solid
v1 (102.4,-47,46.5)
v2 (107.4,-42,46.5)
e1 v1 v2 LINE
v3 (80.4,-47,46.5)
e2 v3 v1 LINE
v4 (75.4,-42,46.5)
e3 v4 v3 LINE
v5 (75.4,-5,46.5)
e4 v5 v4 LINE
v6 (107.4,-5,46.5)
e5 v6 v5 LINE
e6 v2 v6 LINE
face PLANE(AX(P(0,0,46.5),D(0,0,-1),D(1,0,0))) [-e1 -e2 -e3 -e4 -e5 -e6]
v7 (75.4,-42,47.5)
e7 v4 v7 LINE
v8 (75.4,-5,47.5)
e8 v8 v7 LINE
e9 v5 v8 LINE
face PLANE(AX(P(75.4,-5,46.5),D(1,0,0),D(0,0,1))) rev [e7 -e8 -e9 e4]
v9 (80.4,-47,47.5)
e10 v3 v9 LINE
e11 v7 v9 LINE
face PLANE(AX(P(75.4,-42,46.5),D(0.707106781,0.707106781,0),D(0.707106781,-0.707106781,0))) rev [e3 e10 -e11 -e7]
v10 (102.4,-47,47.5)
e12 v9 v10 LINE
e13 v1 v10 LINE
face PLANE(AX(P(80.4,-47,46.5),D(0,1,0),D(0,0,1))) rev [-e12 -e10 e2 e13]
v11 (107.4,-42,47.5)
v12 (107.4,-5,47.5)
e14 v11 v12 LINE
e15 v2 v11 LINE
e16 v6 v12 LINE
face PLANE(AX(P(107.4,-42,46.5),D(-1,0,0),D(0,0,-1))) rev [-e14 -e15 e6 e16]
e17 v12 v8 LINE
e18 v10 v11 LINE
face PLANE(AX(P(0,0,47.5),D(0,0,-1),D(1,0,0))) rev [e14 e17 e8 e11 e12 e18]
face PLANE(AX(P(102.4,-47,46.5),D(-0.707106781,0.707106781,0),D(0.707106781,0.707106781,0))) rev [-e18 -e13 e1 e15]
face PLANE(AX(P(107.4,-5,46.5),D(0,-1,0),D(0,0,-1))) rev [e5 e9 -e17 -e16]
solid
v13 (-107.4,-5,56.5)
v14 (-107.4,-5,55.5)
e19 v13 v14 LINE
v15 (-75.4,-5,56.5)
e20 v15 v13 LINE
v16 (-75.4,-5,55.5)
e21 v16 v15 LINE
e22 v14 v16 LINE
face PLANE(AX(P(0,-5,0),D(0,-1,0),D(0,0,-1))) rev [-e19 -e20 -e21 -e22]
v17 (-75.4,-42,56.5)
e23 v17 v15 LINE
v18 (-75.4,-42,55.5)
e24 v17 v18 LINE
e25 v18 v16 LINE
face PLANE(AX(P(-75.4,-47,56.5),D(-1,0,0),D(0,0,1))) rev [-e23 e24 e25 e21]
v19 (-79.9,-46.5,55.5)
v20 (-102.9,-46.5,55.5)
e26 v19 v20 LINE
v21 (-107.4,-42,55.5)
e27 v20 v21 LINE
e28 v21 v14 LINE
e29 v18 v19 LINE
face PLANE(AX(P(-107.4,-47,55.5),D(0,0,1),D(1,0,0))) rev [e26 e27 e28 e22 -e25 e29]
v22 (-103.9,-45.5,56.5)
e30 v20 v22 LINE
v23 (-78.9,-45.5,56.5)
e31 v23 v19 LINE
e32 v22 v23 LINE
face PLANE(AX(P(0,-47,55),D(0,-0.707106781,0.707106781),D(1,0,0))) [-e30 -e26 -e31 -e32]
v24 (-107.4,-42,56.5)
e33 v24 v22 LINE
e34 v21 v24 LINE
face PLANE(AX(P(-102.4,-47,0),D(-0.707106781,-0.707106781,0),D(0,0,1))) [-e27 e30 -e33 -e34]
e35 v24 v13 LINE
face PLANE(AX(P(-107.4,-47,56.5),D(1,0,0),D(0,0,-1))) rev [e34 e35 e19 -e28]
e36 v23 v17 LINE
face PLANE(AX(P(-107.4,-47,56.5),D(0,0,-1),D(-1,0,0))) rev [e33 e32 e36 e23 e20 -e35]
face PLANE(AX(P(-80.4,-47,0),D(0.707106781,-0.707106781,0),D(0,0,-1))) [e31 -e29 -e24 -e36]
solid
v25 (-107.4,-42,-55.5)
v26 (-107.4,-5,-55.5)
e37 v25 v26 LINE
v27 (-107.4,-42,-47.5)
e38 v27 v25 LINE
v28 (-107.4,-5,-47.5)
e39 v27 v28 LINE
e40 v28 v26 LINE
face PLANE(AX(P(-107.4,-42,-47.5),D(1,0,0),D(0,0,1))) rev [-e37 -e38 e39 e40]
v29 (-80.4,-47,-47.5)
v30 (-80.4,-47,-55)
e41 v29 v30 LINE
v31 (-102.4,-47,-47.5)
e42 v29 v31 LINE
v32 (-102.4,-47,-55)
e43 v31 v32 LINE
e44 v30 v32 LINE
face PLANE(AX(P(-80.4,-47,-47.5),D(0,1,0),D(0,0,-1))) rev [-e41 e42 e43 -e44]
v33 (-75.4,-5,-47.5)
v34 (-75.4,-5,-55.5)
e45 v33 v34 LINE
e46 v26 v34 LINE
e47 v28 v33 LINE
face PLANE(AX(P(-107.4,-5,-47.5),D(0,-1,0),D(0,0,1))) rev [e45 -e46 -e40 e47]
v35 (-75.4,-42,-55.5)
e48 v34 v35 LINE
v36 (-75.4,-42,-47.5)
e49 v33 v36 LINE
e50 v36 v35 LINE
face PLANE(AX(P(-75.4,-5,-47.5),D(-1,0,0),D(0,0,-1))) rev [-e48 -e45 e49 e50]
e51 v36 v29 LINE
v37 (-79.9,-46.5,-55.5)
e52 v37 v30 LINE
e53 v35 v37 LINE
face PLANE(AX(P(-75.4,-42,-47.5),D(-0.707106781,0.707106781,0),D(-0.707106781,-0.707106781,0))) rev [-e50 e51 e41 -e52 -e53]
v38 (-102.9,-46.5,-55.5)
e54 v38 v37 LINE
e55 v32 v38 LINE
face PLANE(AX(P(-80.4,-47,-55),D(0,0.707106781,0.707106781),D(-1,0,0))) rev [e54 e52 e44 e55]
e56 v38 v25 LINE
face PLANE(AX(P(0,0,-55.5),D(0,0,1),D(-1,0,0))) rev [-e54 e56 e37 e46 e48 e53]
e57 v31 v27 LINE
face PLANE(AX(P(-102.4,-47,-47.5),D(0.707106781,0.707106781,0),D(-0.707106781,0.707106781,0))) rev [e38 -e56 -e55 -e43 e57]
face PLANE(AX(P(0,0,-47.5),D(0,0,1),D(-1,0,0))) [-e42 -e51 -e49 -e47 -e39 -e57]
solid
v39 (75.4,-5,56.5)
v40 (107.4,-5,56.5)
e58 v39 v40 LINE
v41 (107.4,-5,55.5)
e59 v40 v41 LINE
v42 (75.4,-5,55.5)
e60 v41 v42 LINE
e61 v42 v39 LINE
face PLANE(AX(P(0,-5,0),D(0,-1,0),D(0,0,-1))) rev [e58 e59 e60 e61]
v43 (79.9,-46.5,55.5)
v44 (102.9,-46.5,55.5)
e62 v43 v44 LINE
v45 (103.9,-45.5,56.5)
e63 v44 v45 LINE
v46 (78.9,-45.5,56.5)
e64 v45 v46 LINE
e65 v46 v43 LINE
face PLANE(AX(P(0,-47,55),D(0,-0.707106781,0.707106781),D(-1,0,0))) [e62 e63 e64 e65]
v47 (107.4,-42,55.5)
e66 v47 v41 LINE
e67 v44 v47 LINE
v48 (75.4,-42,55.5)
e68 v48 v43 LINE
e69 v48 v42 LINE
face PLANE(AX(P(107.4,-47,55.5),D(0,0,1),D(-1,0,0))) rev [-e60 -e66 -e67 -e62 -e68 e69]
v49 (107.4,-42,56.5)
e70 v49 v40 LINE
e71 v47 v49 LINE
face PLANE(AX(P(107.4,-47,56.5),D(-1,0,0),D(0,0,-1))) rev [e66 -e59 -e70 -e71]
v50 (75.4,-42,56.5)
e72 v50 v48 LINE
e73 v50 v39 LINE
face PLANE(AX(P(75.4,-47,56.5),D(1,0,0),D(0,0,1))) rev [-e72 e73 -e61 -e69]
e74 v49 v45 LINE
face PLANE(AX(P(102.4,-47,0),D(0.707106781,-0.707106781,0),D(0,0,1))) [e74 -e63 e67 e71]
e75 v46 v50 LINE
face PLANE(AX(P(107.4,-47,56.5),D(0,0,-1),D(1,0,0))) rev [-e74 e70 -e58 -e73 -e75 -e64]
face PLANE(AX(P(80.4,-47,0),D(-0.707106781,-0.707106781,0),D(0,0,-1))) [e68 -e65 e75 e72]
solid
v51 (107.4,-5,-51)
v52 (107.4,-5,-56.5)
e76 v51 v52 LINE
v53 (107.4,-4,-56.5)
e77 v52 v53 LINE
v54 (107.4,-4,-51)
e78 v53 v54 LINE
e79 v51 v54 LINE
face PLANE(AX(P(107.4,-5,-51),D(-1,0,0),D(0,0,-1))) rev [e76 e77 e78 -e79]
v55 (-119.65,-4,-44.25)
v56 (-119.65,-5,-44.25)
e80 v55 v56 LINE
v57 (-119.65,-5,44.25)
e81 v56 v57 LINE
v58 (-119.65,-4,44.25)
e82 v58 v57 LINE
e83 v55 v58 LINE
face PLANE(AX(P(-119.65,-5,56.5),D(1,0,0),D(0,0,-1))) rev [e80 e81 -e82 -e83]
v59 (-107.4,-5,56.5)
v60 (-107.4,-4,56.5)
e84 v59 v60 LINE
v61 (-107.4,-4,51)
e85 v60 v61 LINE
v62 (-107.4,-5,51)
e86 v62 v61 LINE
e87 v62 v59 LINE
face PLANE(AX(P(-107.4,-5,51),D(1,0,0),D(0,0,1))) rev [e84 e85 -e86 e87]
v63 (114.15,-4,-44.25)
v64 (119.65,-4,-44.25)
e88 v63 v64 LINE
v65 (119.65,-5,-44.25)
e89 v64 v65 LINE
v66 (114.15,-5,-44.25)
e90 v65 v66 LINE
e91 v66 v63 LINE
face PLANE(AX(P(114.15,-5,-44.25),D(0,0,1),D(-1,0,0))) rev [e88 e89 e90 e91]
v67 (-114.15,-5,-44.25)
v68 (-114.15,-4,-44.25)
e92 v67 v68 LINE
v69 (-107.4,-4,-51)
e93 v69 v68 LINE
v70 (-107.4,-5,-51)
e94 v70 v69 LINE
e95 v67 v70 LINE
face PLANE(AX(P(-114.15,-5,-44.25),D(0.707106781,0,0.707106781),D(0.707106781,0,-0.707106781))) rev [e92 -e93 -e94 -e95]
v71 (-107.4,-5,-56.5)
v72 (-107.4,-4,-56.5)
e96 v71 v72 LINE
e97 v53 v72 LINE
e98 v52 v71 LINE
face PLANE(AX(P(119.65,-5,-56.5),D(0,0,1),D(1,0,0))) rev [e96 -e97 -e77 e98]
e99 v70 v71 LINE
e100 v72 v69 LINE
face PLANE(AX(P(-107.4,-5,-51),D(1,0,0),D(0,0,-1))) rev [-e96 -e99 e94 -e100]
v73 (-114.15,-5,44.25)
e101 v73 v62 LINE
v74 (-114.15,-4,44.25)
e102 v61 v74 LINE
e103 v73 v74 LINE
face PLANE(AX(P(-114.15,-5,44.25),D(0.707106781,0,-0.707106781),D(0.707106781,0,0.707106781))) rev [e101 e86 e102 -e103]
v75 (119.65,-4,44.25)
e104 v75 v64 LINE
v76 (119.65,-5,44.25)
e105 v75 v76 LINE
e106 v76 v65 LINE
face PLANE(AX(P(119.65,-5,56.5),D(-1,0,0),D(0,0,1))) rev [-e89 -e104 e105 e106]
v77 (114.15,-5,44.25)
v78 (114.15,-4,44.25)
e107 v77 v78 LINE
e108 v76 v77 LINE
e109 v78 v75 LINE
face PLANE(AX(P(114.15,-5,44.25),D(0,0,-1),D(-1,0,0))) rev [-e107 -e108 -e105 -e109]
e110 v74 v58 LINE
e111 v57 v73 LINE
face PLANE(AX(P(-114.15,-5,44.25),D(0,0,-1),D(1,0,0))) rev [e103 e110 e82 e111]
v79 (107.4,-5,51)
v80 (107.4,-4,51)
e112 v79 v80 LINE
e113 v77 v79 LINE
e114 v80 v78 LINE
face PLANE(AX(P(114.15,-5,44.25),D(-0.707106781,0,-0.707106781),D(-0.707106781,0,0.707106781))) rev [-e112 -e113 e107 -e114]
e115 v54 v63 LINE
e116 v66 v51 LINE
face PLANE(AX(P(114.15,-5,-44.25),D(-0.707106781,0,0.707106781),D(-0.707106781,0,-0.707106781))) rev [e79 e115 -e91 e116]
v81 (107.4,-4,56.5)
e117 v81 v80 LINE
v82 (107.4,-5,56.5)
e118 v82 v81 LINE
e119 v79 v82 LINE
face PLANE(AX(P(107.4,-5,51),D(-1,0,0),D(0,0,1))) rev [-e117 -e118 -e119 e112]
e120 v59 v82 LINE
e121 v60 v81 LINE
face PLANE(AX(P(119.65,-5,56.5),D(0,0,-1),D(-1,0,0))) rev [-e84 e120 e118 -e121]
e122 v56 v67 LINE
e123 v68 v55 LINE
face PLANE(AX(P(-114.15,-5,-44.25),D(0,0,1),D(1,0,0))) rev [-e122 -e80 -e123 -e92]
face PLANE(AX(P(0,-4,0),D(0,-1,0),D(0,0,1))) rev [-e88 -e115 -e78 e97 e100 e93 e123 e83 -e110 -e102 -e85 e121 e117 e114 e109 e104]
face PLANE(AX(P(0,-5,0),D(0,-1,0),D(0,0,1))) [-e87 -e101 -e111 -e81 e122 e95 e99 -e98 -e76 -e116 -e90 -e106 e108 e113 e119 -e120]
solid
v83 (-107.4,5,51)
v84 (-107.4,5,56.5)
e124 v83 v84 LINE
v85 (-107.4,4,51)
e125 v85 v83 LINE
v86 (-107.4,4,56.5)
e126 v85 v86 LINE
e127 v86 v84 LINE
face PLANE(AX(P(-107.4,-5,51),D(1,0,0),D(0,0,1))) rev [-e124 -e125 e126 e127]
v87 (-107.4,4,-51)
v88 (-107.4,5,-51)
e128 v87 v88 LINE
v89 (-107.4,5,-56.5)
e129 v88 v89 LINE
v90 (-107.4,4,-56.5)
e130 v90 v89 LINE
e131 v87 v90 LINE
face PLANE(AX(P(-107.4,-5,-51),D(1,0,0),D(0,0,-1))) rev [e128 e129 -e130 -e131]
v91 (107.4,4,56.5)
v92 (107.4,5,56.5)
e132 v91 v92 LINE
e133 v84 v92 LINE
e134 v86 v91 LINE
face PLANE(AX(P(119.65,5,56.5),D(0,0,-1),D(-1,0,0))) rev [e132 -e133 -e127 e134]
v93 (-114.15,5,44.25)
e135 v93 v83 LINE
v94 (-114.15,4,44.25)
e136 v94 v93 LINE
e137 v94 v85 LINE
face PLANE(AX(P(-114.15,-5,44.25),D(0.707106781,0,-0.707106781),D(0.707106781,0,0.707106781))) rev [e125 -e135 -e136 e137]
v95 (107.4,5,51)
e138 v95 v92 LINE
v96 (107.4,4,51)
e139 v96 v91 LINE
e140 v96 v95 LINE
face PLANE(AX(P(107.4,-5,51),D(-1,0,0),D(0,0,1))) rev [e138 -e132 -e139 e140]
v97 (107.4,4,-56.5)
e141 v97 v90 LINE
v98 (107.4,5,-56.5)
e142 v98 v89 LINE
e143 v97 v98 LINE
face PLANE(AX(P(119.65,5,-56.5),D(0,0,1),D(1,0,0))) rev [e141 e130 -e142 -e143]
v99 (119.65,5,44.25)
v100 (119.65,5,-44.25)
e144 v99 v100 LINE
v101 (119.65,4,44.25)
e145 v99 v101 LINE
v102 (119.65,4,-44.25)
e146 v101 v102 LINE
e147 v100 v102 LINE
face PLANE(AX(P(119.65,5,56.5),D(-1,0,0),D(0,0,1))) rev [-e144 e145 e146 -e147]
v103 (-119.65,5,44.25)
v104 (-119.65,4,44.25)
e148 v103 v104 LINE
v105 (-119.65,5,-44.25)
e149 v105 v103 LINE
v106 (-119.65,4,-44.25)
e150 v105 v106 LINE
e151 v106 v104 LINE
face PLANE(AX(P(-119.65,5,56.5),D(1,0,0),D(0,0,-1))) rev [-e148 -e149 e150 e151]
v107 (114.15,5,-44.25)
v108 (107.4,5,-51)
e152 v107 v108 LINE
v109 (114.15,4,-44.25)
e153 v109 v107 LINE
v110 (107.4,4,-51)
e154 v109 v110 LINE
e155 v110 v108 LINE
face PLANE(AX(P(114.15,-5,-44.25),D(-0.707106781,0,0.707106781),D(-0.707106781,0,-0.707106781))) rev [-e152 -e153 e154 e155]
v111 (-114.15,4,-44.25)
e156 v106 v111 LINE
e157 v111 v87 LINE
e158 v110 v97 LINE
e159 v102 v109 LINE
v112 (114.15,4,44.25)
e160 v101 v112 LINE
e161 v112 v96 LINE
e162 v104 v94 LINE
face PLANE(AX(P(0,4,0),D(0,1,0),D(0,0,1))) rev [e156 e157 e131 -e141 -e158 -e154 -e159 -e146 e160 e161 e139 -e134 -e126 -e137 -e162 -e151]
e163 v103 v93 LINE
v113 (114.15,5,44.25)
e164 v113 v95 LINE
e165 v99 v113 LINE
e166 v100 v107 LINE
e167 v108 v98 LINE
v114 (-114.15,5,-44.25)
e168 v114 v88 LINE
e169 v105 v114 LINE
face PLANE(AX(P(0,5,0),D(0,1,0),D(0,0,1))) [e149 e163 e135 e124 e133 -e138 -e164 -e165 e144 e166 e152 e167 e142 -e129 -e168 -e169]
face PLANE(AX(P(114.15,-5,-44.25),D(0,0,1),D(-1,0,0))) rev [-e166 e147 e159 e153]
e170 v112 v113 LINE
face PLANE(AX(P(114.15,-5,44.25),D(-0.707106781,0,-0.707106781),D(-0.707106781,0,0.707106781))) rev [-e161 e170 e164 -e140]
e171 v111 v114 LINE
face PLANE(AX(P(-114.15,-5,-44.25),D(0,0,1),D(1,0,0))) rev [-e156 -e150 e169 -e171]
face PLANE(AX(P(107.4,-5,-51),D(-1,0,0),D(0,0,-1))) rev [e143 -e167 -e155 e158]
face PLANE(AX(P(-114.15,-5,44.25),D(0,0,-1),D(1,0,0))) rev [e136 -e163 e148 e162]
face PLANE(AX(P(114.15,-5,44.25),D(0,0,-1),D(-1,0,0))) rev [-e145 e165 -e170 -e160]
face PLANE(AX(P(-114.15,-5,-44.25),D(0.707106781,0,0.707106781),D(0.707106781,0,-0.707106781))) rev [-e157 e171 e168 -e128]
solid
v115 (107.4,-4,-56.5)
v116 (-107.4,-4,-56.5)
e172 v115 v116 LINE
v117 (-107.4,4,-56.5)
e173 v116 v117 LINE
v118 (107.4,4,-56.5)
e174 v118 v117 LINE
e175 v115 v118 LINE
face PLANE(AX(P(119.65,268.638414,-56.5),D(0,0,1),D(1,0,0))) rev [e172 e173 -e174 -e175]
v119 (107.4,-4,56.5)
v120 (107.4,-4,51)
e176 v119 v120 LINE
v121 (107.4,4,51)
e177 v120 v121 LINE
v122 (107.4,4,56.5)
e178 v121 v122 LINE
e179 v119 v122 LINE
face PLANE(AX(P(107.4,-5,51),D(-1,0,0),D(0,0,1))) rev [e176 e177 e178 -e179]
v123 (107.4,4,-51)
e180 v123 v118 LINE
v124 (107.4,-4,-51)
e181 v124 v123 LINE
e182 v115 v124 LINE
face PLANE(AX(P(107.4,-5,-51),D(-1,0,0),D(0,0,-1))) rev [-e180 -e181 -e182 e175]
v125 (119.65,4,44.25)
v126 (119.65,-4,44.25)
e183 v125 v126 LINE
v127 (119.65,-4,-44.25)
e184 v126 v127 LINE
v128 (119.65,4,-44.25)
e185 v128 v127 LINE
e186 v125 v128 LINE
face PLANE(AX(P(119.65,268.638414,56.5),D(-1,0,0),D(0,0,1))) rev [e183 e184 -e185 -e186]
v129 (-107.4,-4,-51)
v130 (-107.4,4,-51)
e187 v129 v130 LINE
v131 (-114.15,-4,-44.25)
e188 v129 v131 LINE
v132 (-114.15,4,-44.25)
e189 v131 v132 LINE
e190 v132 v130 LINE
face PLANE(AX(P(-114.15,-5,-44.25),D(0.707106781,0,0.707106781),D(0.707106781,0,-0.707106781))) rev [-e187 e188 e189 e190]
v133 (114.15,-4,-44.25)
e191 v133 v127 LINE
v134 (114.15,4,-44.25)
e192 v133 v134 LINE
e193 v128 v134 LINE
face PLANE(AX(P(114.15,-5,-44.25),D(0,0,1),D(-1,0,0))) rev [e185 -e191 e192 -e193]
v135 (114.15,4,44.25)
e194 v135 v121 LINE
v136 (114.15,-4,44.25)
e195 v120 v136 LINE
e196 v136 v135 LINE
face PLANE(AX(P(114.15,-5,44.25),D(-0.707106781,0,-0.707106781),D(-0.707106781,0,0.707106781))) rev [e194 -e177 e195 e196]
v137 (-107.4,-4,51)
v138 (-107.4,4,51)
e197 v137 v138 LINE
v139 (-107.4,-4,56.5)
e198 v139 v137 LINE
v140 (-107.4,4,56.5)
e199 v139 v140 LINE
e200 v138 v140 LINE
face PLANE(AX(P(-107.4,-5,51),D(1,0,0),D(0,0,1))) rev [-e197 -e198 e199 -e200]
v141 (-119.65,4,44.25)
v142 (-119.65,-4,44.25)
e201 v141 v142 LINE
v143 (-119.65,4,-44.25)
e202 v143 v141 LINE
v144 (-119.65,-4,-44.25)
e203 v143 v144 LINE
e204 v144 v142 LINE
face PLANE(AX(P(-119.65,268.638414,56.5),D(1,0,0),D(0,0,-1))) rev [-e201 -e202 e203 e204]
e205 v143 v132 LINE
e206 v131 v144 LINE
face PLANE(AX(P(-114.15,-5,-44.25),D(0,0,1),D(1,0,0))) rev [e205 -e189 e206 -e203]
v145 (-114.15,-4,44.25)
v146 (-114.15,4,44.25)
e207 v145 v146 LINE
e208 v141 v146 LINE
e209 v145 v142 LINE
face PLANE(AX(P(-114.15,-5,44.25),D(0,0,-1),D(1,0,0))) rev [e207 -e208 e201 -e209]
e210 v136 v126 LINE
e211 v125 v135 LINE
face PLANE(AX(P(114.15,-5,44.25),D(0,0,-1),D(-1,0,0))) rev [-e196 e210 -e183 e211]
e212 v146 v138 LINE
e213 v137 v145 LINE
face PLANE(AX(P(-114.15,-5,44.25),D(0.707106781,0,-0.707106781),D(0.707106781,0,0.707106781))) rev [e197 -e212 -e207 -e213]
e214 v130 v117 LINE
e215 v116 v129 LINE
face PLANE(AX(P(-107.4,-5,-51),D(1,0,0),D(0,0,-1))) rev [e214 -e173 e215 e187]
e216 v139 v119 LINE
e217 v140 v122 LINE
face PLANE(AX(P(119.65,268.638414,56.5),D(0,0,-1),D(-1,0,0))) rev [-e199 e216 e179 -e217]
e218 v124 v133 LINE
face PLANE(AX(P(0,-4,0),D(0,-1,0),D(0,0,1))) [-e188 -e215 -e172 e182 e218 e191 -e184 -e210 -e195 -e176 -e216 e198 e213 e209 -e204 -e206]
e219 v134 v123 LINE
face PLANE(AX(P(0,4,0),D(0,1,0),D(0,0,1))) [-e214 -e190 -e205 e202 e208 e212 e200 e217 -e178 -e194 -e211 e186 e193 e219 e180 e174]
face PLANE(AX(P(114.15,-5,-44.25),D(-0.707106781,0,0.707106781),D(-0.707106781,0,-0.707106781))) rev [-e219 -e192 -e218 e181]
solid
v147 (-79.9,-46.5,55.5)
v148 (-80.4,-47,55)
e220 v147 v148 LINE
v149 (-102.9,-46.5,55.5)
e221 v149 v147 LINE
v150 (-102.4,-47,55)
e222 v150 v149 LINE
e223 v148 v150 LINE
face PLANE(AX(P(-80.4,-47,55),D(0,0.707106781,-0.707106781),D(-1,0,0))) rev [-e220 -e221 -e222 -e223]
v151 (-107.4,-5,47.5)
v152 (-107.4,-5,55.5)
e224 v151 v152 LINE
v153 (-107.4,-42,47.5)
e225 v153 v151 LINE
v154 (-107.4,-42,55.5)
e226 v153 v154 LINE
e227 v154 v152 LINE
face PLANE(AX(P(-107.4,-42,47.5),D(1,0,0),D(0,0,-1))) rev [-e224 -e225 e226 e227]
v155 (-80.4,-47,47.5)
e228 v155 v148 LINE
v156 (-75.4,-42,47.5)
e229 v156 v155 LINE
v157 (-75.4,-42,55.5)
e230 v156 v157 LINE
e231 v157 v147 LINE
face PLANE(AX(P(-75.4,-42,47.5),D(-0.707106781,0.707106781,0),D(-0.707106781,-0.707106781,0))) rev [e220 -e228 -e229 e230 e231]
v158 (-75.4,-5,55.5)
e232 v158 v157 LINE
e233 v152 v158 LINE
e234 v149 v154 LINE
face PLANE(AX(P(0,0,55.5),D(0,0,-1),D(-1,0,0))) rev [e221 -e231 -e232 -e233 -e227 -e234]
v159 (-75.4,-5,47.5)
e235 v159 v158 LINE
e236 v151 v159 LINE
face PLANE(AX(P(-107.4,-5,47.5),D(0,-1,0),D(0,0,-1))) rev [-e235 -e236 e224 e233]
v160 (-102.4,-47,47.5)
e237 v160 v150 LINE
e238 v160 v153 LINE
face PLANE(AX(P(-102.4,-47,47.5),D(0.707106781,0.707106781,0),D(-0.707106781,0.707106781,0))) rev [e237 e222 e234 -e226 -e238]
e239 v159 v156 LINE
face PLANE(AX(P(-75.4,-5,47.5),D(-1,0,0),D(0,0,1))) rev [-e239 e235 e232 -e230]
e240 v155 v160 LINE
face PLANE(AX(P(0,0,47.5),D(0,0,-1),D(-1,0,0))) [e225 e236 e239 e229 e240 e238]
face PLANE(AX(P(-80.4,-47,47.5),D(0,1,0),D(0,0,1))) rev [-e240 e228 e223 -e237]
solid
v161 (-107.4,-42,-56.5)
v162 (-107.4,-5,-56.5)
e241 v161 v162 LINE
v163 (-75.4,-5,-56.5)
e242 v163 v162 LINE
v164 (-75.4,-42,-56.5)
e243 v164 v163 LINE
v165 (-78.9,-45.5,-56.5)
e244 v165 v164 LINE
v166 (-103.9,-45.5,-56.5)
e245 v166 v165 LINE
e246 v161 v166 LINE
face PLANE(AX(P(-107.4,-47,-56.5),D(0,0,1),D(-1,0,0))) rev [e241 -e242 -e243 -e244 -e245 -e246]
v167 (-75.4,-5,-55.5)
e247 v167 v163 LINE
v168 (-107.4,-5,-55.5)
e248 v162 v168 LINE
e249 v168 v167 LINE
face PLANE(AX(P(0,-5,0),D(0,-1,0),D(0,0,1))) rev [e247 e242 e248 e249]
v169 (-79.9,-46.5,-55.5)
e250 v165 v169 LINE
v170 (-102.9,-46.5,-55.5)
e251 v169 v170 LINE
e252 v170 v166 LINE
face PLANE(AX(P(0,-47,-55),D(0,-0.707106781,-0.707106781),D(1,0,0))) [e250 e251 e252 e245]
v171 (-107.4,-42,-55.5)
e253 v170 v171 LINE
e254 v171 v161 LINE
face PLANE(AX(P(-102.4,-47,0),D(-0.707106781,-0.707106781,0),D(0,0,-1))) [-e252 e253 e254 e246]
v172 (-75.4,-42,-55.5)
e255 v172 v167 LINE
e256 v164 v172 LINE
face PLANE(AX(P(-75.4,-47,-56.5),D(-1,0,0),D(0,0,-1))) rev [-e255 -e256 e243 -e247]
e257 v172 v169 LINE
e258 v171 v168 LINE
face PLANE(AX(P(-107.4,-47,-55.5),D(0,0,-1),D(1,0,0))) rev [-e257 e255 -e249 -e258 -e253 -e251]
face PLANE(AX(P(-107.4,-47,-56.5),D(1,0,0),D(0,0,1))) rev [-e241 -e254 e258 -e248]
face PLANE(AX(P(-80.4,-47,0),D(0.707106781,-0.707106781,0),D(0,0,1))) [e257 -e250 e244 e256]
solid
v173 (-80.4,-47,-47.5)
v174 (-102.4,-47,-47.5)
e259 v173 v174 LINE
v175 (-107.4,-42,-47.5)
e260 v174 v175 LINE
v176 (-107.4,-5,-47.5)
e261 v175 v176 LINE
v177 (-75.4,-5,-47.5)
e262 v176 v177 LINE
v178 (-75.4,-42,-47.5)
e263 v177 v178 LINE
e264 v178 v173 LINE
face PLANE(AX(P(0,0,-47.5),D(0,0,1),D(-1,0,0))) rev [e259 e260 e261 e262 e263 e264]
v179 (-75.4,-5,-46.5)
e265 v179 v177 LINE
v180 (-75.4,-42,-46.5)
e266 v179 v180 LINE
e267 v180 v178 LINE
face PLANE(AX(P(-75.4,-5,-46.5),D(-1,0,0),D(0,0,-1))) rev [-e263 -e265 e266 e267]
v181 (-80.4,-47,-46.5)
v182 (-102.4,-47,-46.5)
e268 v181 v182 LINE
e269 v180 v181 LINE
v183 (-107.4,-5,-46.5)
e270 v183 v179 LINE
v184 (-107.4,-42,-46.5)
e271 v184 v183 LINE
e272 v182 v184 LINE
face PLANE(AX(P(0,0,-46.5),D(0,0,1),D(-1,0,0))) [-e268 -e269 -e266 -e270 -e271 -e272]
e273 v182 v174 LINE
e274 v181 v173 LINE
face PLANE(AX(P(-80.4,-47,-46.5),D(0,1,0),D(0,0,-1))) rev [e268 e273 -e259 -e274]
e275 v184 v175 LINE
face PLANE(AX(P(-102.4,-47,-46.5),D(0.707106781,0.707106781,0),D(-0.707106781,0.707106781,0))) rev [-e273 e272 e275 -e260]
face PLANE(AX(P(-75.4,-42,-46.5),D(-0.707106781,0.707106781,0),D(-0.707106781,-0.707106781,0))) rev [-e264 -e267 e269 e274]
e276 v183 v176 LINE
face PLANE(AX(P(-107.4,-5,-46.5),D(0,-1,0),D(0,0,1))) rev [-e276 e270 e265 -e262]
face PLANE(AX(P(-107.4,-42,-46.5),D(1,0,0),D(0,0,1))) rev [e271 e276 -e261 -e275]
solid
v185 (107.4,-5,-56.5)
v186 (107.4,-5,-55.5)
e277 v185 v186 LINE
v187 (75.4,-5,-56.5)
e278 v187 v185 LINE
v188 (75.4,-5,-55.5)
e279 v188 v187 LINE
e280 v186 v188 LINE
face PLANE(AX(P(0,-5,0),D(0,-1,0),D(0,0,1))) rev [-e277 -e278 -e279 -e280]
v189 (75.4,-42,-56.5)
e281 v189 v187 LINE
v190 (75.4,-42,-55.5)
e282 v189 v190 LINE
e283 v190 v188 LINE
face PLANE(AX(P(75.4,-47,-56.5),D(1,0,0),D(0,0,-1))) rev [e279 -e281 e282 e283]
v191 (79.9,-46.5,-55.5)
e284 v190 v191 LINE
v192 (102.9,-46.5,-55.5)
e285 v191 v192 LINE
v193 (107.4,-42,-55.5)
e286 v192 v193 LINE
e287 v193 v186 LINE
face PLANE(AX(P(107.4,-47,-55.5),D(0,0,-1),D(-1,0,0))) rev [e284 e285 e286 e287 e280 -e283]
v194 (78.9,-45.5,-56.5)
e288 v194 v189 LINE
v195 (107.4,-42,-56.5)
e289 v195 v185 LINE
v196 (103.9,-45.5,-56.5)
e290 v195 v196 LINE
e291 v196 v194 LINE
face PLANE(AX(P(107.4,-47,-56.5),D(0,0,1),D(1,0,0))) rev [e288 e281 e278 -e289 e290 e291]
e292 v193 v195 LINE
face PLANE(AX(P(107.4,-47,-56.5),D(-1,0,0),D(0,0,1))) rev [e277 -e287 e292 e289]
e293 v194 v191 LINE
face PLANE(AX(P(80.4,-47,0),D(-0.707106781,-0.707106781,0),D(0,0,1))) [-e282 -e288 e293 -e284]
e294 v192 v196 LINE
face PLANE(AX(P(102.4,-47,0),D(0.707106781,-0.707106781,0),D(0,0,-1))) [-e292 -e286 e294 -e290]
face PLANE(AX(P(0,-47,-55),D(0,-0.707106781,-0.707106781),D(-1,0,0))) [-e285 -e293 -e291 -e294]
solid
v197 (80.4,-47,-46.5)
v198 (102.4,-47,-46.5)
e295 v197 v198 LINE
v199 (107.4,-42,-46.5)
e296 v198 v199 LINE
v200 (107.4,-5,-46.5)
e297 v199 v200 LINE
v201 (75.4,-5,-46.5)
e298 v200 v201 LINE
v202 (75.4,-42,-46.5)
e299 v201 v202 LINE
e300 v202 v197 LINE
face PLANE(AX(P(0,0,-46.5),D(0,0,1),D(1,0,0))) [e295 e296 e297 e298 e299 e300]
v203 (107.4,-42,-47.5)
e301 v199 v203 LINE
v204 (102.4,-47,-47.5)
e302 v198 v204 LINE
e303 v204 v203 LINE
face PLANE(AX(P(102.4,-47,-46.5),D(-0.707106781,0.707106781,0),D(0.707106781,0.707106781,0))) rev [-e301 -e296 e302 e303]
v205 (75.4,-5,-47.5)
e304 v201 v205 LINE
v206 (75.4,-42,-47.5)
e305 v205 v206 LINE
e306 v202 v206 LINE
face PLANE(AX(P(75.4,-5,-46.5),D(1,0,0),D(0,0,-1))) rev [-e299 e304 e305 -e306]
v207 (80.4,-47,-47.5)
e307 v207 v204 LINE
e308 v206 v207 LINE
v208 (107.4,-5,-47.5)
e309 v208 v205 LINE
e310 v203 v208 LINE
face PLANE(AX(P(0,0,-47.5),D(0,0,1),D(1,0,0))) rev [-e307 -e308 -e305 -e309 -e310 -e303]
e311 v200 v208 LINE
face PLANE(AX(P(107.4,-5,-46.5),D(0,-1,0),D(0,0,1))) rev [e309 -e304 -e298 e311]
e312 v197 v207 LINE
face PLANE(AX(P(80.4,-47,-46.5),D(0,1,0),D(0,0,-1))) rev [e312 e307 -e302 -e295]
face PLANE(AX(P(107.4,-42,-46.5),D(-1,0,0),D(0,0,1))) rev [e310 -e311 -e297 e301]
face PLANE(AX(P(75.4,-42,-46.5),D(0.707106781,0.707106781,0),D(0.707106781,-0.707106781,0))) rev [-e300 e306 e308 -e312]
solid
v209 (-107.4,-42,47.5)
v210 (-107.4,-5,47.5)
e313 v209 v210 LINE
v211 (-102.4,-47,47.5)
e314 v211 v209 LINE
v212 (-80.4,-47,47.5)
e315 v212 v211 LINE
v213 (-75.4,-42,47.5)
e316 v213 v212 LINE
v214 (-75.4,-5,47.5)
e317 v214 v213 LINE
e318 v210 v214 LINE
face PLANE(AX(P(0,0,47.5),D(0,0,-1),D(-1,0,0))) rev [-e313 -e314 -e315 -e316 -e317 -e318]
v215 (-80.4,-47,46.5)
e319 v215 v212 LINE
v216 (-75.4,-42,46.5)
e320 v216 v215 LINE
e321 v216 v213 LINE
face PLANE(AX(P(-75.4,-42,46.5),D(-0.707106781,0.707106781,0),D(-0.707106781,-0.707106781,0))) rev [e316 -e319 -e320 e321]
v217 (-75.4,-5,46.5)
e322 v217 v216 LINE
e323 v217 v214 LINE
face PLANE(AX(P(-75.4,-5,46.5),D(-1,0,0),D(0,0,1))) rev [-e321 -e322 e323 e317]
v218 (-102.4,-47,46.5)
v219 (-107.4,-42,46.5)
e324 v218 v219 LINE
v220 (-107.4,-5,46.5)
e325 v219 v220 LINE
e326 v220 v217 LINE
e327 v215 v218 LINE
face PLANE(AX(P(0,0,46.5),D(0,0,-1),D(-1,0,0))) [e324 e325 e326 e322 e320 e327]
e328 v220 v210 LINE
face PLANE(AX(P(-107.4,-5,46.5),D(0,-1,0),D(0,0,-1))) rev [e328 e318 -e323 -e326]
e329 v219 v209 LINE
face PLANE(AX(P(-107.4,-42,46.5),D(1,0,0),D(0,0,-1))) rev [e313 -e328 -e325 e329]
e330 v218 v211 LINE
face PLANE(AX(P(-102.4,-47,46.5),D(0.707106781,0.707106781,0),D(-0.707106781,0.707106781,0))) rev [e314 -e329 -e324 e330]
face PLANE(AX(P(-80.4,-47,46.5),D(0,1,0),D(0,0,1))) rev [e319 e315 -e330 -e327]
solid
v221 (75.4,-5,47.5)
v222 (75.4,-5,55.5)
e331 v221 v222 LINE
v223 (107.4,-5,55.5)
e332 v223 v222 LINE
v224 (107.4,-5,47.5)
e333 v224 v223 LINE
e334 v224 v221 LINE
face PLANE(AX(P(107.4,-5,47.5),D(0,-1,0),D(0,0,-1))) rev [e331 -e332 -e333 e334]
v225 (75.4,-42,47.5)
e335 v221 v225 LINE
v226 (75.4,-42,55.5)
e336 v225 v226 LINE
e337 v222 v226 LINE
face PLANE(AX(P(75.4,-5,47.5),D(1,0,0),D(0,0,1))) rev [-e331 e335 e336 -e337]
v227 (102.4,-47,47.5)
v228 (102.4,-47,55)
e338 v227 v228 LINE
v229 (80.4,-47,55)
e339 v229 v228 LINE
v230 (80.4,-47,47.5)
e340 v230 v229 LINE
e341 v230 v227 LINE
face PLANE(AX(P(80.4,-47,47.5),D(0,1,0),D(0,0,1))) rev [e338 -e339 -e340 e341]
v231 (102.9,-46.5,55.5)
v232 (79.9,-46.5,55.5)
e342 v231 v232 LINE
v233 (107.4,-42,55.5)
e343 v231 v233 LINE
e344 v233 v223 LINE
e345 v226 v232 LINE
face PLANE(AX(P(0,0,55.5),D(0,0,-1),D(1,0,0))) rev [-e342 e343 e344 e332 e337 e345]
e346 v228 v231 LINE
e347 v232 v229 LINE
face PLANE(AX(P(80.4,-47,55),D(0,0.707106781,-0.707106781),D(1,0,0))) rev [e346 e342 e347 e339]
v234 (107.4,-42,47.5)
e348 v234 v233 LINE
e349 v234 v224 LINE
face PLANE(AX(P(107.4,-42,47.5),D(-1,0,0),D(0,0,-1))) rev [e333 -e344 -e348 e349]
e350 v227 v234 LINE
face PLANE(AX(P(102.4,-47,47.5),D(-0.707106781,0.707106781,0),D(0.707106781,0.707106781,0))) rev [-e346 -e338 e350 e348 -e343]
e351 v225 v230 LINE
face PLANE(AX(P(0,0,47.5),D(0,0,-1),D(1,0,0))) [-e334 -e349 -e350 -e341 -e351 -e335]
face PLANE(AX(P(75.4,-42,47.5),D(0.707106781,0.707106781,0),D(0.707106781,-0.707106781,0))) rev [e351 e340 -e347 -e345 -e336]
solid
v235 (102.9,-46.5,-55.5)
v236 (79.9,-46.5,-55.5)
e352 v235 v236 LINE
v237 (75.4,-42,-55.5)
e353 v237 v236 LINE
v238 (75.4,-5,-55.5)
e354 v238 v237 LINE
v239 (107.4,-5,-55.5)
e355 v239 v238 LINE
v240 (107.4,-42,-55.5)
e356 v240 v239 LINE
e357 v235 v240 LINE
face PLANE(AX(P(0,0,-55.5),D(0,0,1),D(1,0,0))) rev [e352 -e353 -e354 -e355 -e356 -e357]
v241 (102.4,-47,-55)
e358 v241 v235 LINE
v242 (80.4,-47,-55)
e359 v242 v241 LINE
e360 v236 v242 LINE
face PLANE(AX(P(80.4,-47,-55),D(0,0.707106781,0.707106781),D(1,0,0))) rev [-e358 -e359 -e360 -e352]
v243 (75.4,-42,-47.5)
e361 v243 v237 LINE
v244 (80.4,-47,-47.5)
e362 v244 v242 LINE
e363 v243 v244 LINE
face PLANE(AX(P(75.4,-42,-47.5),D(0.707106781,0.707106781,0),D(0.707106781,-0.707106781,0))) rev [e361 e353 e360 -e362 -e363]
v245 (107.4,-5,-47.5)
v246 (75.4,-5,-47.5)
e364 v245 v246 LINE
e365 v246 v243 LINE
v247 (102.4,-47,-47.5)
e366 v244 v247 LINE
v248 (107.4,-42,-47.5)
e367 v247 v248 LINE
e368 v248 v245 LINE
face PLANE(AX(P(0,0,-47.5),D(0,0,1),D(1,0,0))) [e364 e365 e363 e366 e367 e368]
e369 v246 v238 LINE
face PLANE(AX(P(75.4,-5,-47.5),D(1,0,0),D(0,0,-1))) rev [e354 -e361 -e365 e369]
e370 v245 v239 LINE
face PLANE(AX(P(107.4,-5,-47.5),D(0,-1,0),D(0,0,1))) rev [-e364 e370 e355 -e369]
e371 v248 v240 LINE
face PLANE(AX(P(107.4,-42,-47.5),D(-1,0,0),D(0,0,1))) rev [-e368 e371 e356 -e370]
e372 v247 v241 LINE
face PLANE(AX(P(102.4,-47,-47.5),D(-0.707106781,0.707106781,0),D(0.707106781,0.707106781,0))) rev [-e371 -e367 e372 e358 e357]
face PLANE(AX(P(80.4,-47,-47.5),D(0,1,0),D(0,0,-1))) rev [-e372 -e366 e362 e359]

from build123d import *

# Parameters (mm, degrees)
BOSS_EXTRUDE1_START  = 4
SKETCH3_W            = 239.3
SKETCH3_H            = 113
BOSS_EXTRUDE1_DEPTH  = 1
BOSS_EXTRUDE2_START  = -4
SKETCH3_2_W          = 239.3
SKETCH3_2_H          = 113
BOSS_EXTRUDE2_DEPTH  = 8
CUT_EXTRUDE1_DEPTH   = 133.413641669
MIRROR6_COPY_1_DEPTH = 133.413641669
SKETCH4_W            = 32
SKETCH4_H            = 1
BOSS_EXTRUDE3_DEPTH  = 42
CHAMFER1_SIZE        = 5
BOSS_EXTRUDE4_DEPTH  = 8
BOSS_EXTRUDE5_DEPTH  = 1
CHAMFER2_SIZE        = 1.5
CHAMFER3_SIZE        = 0.5


with BuildPart() as part:
    # Sketch3 → Boss-Extrude1 (new body)
    with BuildSketch(Plane(origin=(0, 0, 0), x_dir=(1, 0, 0), z_dir=(0, 1, 0)).offset(BOSS_EXTRUDE1_START)):
        Rectangle(SKETCH3_W, SKETCH3_H)
    extrude(amount=BOSS_EXTRUDE1_DEPTH)


with BuildPart() as body_2:
    # Mirror3: mirrored copy
    add(part.part.mirror(Plane.ZX))


with BuildPart() as body_3:
    # Sketch3<2> → Boss-Extrude2 (new body)
    with BuildSketch(Plane(origin=(0, 0, 0), x_dir=(1, 0, 0), z_dir=(0, 1, 0)).offset(BOSS_EXTRUDE2_START)):
        Rectangle(SKETCH3_2_W, SKETCH3_2_H)
    extrude(amount=BOSS_EXTRUDE2_DEPTH)


with BuildPart() as cut_extrude1_tool:
    # Sketch2 → Cut-Extrude1 (new, symmetric)
    with BuildSketch(Plane(origin=(0, 0, 0), x_dir=(1, 0, 0), z_dir=(0, 1, 0))):
        Polygon((-110.4, 57), (-107.4, 57), (-107.4, 51), (-114.15, 44.25), (-120.15, 44.25), (-120.15, 47.25), (-120.15, 57), align=None)
    cut_extrude1 = extrude(amount=CUT_EXTRUDE1_DEPTH, both=True)


with BuildPart() as part_1:
    add(part.part)

    # Cut-Extrude1: cut by cut_extrude1_tool
    add(cut_extrude1_tool.part, mode=Mode.SUBTRACT)


with BuildPart() as body_2_1:
    add(body_2.part)

    # Cut-Extrude1: cut by cut_extrude1_tool
    add(cut_extrude1_tool.part, mode=Mode.SUBTRACT)


with BuildPart() as body_3_1:
    add(body_3.part)

    # Cut-Extrude1: cut by cut_extrude1_tool
    add(cut_extrude1_tool.part, mode=Mode.SUBTRACT)


with BuildPart() as mirror5_tool:
    # Mirror5: Cut-Extrude1 across plane
    add(cut_extrude1.mirror(Plane.XY))


with BuildPart() as part_2:
    add(part_1.part)

    # Mirror5: cut by mirror5_tool
    add(mirror5_tool.part, mode=Mode.SUBTRACT)


with BuildPart() as body_2_2:
    add(body_2_1.part)

    # Mirror5: cut by mirror5_tool
    add(mirror5_tool.part, mode=Mode.SUBTRACT)


with BuildPart() as body_3_2:
    add(body_3_1.part)

    # Mirror5: cut by mirror5_tool
    add(mirror5_tool.part, mode=Mode.SUBTRACT)


with BuildPart() as mirror6_tool:
    # Mirror6: Cut-Extrude1 across plane
    add(cut_extrude1.mirror(Plane(origin=(0, 0, 0), x_dir=(0, 0, 1), z_dir=(1, 0, 0))))


with BuildPart() as part_3:
    add(part_2.part)

    # Mirror6: cut by mirror6_tool
    add(mirror6_tool.part, mode=Mode.SUBTRACT)


with BuildPart() as body_2_3:
    add(body_2_2.part)

    # Mirror6: cut by mirror6_tool
    add(mirror6_tool.part, mode=Mode.SUBTRACT)


with BuildPart() as body_3_3:
    add(body_3_2.part)

    # Mirror6: cut by mirror6_tool
    add(mirror6_tool.part, mode=Mode.SUBTRACT)


with BuildPart() as mirror6_copy_1_tool:
    # Mirror6 copy 1 sketch → Mirror6 copy 1 (new, symmetric)
    with BuildSketch(Plane(origin=(0, 0, 0), x_dir=(-1, 0, 0), z_dir=(0, 1, 0))):
        Polygon((-110.4, 57), (-107.4, 57), (-107.4, 51), (-114.15, 44.25), (-120.15, 44.25), (-120.15, 47.25), (-120.15, 57), align=None)
    extrude(amount=MIRROR6_COPY_1_DEPTH, both=True)


with BuildPart() as part_4:
    add(part_3.part)

    # Mirror6 copy 1: cut by mirror6_copy_1_tool
    add(mirror6_copy_1_tool.part, mode=Mode.SUBTRACT)


with BuildPart() as body_2_4:
    add(body_2_3.part)

    # Mirror6 copy 1: cut by mirror6_copy_1_tool
    add(mirror6_copy_1_tool.part, mode=Mode.SUBTRACT)


with BuildPart() as body_3_4:
    add(body_3_3.part)

    # Mirror6 copy 1: cut by mirror6_copy_1_tool
    add(mirror6_copy_1_tool.part, mode=Mode.SUBTRACT)


with BuildPart() as body_4:
    # Sketch4 → Boss-Extrude3 (new body)
    with BuildSketch(Plane.XZ.offset(5)):
        with Locations((-91.4, 56)):
            Rectangle(SKETCH4_W, SKETCH4_H)
    extrude(amount=BOSS_EXTRUDE3_DEPTH)

    # Chamfer1
    chamfer1_edges = [body_4.edges().sort_by_distance(p)[0] for p in [
        (-75.4, -47, 56),
        (-107.4, -47, 56),
    ]]
    chamfer(chamfer1_edges, length=CHAMFER1_SIZE)

    # Chamfer2
    # the kernel refuses this chamfer: 1.5 mm, written as the material it takes off along each edge
    with BuildSketch(Plane(origin=(-106.257524482, -47, 56.5), x_dir=(0, 0.9996219169112965, 0.02749587661058676), z_dir=(1, 0, 0))) as chamfer2_piece_1:
        Polygon((CHAMFER2_SIZE * 0.999621916911, -CHAMFER2_SIZE * 0.0274958766106), (-CHAMFER2_SIZE * 0.0274958766106, -CHAMFER2_SIZE * 0.999621916911), (0, 0), align=None)
    extrude(amount=29.715048964, mode=Mode.SUBTRACT)


with BuildPart() as body_5:
    # Sketch6 → Boss-Extrude4 (new body)
    with BuildSketch(Plane(origin=(0, 0, 55.5), x_dir=(-1, 0, 0), z_dir=(0, 0, -1))):
        Polygon((107.4, -5), (75.4, -5), (75.4, -42), (80.4, -47), (102.4, -47), (107.4, -42), align=None)
    extrude(amount=BOSS_EXTRUDE4_DEPTH)

    # Chamfer3
    chamfer3_edges = [body_5.edges().sort_by_distance(p)[0] for p in [
        (-91.4, -47, 55.5),
    ]]
    chamfer(chamfer3_edges, length=CHAMFER3_SIZE)


with BuildPart() as body_6:
    # Sketch7 → Boss-Extrude5 (new body)
    with BuildSketch(Plane(origin=(0, 0, 47.5), x_dir=(-1, 0, 0), z_dir=(0, 0, -1))):
        Polygon((107.4, -42), (107.4, -5), (75.4, -5), (75.4, -42), (80.4, -47), (102.4, -47), align=None)
    extrude(amount=BOSS_EXTRUDE5_DEPTH)


with BuildPart() as body_7:
    # Mirror7: mirrored copy
    add(body_6.part.mirror(Plane.XY))


with BuildPart() as body_8:
    # Mirror7 2: mirrored copy
    add(body_5.part.mirror(Plane.XY))


with BuildPart() as body_9:
    # Mirror7 3: mirrored copy
    add(body_4.part.mirror(Plane.XY))


with BuildPart() as body_10:
    # Mirror8: mirrored copy
    add(body_9.part.mirror(Plane(origin=(0, 0, 0), x_dir=(0, 0, 1), z_dir=(1, 0, 0))))


with BuildPart() as body_11:
    # Mirror8 2: mirrored copy
    add(body_8.part.mirror(Plane(origin=(0, 0, 0), x_dir=(0, 0, 1), z_dir=(1, 0, 0))))


with BuildPart() as body_12:
    # Mirror8 3: mirrored copy
    add(body_6.part.mirror(Plane(origin=(0, 0, 0), x_dir=(0, 0, 1), z_dir=(1, 0, 0))))


with BuildPart() as body_13:
    # Mirror8 4: mirrored copy
    add(body_5.part.mirror(Plane(origin=(0, 0, 0), x_dir=(0, 0, 1), z_dir=(1, 0, 0))))


with BuildPart() as body_14:
    # Mirror8 5: mirrored copy
    add(body_7.part.mirror(Plane(origin=(0, 0, 0), x_dir=(0, 0, 1), z_dir=(1, 0, 0))))


with BuildPart() as body_15:
    # Mirror8 6: mirrored copy
    add(body_4.part.mirror(Plane(origin=(0, 0, 0), x_dir=(0, 0, 1), z_dir=(1, 0, 0))))


solid = Compound([part_4.part, body_2_4.part, body_3_4.part, body_4.part, body_5.part, body_6.part, body_7.part, body_8.part, body_9.part, body_10.part, body_11.part, body_12.part, body_13.part, body_14.part, body_15.part])
